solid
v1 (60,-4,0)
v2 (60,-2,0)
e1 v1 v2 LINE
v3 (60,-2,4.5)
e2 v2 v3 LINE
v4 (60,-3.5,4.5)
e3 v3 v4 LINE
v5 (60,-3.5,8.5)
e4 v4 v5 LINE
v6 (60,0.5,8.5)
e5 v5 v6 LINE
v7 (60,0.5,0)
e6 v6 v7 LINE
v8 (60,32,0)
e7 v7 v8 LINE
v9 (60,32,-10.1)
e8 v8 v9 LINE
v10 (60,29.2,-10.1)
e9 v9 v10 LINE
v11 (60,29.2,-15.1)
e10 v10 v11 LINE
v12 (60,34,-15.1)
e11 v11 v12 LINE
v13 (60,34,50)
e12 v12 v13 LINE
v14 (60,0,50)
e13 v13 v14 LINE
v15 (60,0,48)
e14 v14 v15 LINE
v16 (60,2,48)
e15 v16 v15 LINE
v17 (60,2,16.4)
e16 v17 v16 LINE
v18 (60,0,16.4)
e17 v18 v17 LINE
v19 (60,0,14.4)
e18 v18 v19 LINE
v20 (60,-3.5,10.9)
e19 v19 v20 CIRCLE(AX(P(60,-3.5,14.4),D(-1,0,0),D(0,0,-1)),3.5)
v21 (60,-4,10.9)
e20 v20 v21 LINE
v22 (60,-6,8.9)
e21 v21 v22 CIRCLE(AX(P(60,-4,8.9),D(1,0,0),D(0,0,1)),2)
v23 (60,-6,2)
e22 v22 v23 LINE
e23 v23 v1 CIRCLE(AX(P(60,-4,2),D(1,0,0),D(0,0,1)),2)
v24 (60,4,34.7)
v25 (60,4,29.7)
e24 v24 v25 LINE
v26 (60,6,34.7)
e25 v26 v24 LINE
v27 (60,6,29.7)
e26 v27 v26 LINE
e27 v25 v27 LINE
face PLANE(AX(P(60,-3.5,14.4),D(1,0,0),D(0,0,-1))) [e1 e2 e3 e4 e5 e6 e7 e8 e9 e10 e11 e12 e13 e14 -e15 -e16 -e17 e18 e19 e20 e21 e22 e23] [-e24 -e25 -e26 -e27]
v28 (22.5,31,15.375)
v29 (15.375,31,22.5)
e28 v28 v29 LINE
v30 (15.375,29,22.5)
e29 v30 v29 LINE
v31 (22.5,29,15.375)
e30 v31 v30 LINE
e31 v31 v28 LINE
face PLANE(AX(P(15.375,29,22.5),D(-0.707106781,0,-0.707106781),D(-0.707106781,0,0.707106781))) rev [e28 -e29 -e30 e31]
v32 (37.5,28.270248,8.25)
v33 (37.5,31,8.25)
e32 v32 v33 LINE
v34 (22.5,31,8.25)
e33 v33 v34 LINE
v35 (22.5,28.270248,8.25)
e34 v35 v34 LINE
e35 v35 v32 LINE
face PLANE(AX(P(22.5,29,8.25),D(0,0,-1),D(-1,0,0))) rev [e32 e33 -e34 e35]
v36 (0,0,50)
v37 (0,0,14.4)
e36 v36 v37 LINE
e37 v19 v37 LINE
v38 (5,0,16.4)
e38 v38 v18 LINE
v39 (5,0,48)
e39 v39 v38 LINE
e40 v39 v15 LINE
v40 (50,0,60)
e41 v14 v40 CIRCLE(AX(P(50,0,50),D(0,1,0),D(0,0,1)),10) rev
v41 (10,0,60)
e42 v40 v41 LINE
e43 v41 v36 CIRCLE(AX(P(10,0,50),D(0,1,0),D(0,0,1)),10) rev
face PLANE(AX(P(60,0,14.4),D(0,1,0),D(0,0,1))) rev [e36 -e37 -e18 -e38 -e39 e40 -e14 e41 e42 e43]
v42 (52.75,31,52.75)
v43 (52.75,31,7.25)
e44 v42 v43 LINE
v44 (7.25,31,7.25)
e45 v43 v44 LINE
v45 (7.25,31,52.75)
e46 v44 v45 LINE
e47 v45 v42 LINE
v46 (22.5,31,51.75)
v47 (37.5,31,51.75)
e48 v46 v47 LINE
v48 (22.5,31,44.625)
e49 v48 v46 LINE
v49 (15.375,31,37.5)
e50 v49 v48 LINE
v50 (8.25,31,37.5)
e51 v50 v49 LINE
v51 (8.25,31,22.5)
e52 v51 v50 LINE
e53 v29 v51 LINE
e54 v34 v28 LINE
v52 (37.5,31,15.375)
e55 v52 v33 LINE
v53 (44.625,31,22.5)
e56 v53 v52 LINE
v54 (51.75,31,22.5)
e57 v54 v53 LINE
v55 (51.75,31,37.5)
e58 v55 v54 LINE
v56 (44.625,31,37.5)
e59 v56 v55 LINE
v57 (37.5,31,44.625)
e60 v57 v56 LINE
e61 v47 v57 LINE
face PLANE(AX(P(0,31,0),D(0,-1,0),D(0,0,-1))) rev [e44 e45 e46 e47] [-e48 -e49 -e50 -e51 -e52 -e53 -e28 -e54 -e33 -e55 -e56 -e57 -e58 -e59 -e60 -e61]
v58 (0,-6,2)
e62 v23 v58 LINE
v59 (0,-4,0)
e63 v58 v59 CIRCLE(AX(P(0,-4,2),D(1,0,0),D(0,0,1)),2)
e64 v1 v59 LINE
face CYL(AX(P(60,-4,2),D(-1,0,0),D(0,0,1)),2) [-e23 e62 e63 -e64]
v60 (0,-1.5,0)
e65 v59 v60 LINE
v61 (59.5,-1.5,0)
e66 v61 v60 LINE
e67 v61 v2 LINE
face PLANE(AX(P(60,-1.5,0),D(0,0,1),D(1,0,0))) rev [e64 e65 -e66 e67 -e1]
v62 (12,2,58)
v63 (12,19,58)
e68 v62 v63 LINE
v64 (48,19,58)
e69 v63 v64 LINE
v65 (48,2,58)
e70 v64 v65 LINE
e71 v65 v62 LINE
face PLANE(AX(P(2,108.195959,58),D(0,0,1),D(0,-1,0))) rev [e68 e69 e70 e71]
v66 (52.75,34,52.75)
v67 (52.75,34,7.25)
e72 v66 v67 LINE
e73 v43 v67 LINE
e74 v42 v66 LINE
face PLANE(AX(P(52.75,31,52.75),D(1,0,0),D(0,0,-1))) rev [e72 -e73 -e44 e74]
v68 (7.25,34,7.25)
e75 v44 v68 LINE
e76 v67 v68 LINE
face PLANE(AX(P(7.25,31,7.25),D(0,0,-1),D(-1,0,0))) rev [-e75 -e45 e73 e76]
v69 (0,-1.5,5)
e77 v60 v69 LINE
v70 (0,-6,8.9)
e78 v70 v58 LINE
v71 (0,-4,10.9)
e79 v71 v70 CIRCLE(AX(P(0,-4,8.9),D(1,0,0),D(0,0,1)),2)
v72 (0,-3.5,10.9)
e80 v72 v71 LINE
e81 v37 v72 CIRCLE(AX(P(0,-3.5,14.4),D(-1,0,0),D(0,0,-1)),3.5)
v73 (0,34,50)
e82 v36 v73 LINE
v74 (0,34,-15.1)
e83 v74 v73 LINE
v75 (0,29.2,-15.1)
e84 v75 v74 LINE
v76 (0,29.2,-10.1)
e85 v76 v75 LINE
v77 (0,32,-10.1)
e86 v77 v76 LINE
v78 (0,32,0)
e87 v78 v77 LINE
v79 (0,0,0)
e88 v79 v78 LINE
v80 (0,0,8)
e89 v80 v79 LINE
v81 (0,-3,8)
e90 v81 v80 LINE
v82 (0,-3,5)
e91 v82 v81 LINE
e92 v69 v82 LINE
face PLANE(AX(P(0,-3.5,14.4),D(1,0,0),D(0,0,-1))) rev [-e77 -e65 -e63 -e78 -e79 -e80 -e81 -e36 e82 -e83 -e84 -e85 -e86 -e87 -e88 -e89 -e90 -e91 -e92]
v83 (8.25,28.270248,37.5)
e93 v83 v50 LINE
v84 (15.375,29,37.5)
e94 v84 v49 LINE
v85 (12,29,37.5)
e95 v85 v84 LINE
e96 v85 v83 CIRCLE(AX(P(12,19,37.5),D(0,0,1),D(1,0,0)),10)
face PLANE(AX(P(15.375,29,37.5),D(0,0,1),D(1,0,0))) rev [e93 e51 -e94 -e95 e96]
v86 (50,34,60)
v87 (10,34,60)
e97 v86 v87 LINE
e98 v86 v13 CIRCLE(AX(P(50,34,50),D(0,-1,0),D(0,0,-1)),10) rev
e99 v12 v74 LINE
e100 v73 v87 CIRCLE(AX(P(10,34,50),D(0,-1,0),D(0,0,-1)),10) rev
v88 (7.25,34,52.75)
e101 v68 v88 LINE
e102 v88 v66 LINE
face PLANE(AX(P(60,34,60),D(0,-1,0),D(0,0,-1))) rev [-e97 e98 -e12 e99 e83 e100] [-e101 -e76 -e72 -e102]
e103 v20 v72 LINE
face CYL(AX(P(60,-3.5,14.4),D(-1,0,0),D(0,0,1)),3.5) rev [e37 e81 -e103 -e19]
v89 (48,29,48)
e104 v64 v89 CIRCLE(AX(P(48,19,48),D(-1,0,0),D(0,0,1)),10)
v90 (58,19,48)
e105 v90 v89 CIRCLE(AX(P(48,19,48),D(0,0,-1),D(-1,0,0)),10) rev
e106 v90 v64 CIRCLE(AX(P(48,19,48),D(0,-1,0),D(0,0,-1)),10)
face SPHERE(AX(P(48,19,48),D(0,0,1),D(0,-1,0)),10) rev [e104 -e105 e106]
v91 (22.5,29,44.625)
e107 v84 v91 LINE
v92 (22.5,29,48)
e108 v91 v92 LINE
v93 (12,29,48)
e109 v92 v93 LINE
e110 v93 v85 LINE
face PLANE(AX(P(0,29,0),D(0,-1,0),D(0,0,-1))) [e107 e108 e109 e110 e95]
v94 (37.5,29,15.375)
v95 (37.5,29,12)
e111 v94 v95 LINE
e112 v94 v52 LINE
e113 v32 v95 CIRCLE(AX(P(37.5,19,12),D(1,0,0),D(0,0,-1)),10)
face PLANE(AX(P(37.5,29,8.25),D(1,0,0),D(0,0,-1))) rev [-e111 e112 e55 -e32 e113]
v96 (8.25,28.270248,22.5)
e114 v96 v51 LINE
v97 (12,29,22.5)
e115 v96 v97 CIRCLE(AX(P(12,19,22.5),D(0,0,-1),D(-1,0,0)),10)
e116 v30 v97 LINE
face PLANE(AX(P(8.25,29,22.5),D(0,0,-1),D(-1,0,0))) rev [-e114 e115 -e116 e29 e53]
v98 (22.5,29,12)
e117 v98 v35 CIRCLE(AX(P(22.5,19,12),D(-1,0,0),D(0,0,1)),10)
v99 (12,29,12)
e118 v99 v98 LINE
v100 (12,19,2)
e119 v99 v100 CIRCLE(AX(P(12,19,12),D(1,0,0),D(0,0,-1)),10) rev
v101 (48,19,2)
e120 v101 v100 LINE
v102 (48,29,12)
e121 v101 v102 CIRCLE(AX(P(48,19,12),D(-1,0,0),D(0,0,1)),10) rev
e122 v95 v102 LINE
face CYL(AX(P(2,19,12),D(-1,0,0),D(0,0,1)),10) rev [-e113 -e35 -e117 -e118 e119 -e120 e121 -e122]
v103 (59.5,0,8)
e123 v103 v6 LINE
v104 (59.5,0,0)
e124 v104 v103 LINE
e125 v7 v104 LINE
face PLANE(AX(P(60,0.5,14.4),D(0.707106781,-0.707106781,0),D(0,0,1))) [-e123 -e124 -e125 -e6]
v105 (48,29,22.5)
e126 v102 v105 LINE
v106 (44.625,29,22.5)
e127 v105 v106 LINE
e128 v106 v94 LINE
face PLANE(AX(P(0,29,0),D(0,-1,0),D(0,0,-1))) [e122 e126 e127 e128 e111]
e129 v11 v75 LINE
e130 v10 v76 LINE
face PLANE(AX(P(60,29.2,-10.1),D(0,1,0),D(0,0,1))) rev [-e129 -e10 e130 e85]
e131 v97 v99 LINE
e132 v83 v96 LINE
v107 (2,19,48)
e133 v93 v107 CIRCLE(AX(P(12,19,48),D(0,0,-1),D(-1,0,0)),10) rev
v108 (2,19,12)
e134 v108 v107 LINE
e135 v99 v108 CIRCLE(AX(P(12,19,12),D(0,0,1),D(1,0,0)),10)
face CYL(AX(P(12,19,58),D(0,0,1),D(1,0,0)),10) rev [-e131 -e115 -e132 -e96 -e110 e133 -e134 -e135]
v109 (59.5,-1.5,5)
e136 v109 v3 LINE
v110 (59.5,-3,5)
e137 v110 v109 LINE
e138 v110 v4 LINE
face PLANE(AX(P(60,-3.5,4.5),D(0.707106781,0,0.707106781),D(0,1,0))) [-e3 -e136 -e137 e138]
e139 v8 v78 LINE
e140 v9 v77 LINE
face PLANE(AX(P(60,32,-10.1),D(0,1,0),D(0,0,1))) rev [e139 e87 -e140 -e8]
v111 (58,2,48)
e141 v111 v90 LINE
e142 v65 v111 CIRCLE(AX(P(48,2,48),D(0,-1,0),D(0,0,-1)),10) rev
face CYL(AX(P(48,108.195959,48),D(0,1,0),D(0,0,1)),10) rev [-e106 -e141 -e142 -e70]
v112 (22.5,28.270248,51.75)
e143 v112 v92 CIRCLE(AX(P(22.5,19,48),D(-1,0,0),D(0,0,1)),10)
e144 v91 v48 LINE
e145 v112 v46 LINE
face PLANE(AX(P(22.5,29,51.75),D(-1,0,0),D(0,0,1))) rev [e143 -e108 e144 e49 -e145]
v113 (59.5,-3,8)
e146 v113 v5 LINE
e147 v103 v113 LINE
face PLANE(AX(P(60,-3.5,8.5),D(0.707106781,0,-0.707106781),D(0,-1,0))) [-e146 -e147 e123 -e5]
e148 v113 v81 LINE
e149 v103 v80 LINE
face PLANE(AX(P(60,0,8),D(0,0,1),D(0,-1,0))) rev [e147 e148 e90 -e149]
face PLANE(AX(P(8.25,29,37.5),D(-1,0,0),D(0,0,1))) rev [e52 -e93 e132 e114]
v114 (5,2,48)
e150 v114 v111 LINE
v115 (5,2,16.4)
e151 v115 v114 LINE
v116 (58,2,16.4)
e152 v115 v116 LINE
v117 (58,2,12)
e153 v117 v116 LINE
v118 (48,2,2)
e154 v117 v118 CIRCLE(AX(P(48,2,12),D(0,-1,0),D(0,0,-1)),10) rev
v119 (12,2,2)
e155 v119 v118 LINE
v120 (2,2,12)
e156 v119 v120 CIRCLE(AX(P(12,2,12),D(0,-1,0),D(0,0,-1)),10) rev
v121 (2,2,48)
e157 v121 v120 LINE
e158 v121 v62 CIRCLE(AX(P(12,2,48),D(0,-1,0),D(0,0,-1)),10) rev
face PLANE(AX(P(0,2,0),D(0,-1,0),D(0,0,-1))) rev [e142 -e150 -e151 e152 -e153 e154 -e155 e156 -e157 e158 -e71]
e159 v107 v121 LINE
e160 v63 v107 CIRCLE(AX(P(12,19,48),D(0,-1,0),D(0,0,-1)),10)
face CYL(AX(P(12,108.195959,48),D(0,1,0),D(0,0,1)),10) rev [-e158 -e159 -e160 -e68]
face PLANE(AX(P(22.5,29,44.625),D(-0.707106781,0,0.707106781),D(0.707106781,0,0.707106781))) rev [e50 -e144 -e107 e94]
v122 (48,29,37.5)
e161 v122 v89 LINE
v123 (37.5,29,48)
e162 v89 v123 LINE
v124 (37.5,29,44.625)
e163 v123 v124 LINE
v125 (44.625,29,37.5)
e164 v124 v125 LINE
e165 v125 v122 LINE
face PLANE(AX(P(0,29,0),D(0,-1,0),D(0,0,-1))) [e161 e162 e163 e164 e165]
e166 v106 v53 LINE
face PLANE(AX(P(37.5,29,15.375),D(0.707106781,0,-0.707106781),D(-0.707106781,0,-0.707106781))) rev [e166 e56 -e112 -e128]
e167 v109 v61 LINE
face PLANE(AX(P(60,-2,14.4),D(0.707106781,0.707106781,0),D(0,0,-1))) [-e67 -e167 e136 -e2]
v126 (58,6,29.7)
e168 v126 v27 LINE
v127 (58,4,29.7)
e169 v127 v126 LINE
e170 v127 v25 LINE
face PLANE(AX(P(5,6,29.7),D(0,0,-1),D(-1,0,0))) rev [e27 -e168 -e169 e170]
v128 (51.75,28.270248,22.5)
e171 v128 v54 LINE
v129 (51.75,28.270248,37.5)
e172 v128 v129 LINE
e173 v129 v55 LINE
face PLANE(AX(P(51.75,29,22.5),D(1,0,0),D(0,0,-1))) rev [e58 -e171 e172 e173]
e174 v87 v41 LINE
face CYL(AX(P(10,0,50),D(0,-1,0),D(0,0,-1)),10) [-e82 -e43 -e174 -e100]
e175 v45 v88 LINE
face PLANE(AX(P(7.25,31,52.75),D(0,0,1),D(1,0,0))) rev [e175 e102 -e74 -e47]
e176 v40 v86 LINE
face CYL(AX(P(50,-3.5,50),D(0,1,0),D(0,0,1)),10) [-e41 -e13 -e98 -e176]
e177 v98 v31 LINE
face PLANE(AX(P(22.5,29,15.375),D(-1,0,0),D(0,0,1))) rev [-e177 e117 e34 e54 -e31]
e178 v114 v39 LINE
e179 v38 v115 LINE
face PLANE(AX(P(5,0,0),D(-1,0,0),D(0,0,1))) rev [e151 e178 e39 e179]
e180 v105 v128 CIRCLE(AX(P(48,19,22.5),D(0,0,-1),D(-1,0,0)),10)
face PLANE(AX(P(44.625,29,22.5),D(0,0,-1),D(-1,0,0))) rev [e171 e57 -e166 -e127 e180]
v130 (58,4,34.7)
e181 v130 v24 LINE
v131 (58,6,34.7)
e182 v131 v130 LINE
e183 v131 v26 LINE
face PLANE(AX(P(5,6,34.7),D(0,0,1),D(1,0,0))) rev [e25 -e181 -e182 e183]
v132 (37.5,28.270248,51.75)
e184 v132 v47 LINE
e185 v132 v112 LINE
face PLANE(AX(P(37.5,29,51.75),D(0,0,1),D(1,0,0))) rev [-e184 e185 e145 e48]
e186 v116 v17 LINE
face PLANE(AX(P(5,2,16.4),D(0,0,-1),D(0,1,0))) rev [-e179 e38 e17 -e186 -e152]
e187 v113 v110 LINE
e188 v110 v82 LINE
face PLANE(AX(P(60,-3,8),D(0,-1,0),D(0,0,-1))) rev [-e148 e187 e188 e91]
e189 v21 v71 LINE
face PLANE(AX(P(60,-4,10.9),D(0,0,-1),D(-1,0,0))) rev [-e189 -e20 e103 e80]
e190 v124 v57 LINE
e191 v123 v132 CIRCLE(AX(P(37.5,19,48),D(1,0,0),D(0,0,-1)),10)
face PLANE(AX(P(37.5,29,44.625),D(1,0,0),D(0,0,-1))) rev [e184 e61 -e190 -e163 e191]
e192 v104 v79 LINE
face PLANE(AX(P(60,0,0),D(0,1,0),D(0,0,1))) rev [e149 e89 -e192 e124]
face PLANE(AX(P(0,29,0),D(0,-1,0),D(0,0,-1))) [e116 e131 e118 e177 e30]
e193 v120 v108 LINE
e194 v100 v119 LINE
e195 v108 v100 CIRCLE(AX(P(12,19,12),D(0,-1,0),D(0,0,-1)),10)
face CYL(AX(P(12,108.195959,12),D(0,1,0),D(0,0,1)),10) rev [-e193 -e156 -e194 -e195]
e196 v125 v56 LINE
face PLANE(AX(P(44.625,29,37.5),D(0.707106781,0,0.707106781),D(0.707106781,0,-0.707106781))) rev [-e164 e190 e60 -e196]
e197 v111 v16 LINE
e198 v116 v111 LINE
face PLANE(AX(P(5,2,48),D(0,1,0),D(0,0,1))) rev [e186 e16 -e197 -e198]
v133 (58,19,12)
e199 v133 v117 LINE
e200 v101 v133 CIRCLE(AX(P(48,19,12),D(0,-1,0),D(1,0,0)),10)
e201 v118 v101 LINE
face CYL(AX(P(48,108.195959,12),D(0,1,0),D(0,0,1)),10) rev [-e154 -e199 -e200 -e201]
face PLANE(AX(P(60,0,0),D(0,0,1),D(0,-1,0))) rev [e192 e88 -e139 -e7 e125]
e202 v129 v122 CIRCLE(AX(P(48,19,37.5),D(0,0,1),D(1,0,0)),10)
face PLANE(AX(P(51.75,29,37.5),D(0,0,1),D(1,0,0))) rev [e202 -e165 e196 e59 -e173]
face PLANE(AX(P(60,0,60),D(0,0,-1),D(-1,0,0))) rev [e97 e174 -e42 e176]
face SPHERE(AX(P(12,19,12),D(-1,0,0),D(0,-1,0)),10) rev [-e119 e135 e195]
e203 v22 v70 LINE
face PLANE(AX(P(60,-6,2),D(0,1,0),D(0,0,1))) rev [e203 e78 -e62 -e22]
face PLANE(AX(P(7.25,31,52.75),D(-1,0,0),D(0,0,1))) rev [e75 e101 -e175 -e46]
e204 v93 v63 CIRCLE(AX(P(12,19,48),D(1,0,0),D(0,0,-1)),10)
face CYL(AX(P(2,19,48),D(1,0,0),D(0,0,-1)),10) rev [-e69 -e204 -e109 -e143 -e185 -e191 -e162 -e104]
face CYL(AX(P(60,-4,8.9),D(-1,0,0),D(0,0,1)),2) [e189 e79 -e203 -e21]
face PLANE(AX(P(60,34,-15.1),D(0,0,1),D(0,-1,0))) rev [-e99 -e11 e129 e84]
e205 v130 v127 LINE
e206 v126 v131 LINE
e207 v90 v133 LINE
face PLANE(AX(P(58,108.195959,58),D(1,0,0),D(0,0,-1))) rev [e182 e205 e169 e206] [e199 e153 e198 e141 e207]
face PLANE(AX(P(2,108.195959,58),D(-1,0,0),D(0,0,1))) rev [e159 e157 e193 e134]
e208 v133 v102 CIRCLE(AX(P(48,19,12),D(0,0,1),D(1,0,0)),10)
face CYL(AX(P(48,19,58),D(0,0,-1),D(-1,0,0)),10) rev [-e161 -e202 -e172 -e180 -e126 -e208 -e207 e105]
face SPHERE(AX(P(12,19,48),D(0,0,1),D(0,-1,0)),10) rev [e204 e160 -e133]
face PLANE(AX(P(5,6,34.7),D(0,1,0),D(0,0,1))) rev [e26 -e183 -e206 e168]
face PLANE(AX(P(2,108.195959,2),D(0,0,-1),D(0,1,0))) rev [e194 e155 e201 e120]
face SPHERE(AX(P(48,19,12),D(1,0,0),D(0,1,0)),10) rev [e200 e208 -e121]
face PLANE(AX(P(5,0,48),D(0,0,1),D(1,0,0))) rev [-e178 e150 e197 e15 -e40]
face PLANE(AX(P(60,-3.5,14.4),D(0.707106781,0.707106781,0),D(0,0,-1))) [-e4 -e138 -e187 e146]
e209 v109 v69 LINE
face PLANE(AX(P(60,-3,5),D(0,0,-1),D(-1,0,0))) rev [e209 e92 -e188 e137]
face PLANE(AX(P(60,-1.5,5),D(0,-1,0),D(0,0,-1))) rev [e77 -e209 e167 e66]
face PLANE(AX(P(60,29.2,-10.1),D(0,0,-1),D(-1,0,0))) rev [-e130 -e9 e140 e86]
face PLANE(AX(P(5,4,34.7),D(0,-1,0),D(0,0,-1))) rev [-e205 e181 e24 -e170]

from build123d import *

# Parameters (mm, degrees)
BOSS_EXTRU_1_DEPTH       = 60
ESQUISSE4_W              = 45.5
ESQUISSE4_H              = 45.5
ENL_V_MAT_EXTRU_2_DEPTH  = 3
ENL_V_MAT_EXTRU_4_DEPTH  = 2
ENL_V_START              = -2
ESQUISSE5_W              = 56
ESQUISSE5_H              = 56
ENL_V_MAT_EXTRU_3_DEPTH  = 27
CONG_1_R                 = 10
CHANFREIN1_SIZE          = 0.5
ESQUISSE15_W             = 31.6
ESQUISSE15_H             = 2
ESQUISSE15_W_2           = 5
ENL_V_MAT_EXTRU_11_DEPTH = 55


with BuildPart() as part:
    # Esquisse1 → Boss.-Extru.1 (new body)
    with BuildSketch(Plane(origin=(0, 0, 0), x_dir=(0, 0, -1), z_dir=(1, 0, 0))):
        with BuildLine():
            Line((0, 0), (-8, 0))
            Line((-8, 0), (-8, -3))
            Line((-8, -3), (-5, -3))
            Line((-5, -3), (-5, -1.5))
            Line((-5, -1.5), (0, -1.5))
            Line((0, -1.5), (0, -4))
            ThreePointArc((0, -4), (-0.585786438, -5.414213562), (-2, -6))
            Line((-2, -6), (-8.9, -6))
            ThreePointArc((-8.9, -6), (-10.314213562, -5.414213562), (-10.9, -4))
            Line((-10.9, -4), (-10.9, -3.5))
            ThreePointArc((-10.9, -3.5), (-11.925126266, -1.025126266), (-14.4, 0))
            Line((-14.4, 0), (-60, 0))
            Line((-60, 0), (-60, 34))
            Line((-60, 34), (15.1, 34))
            Line((15.1, 34), (15.1, 29.2))
            Line((15.1, 29.2), (10.1, 29.2))
            Line((10.1, 29.2), (10.1, 32))
            Line((10.1, 32), (0, 32))
            Line((0, 32), (0, 0))
        make_face()
    extrude(amount=BOSS_EXTRU_1_DEPTH)

    # Esquisse4 → Enlèv. mat.-Extru.2 (cut)
    with BuildSketch(Plane(origin=(0, 34, 0), x_dir=(1, 0, 0), z_dir=(0, 1, 0))):
        with Locations((30, -30)):
            Rectangle(ESQUISSE4_W, ESQUISSE4_H)
    extrude(amount=-ENL_V_MAT_EXTRU_2_DEPTH, mode=Mode.SUBTRACT)

    # Esquisse6 → Enlèv. mat.-Extru.4 (cut)
    with BuildSketch(Plane(origin=(0, 31, 0), x_dir=(1, 0, 0), z_dir=(0, 1, 0))):
        Polygon((8.25, -22.5), (15.375, -22.5), (22.5, -15.375), (22.5, -8.25), (37.5, -8.25), (37.5, -15.375), (44.625, -22.5), (51.75, -22.5), (51.75, -37.5), (44.625, -37.5), (37.5, -44.625), (37.5, -51.75), (22.5, -51.75), (22.5, -44.625), (15.375, -37.5), (8.25, -37.5), align=None)
    extrude(amount=-ENL_V_MAT_EXTRU_4_DEPTH, mode=Mode.SUBTRACT)

    # Esquisse5 → Enlèv. mat.-Extru.3 (cut)
    with BuildSketch(Plane.XZ.offset(ENL_V_START)):
        with Locations((30, 30)):
            Rectangle(ESQUISSE5_W, ESQUISSE5_H)
    extrude(amount=-ENL_V_MAT_EXTRU_3_DEPTH, mode=Mode.SUBTRACT)

    # Congé1
    # the kernel refuses this fillet: 10 mm, written as the material it adds along each edge
    with BuildSketch(Plane(origin=(48, 19, 12), x_dir=(1, 0, 0), z_dir=(0, 1, 0))) as cong_1_piece_1_section:
        Polygon((0, 0), (CONG_1_R, 0), (CONG_1_R, CONG_1_R), (0, CONG_1_R), align=None)
    cong_1_piece_1 = extrude(amount=CONG_1_R, mode=Mode.PRIVATE)
    cong_1_piece_1 = cong_1_piece_1 - Plane(origin=(48, 19, 12), x_dir=(-0.7071067811865476, 0, 0.7071067811865475), z_dir=(0, 1, 0)) * Sphere(CONG_1_R, mode=Mode.PRIVATE)
    add(cong_1_piece_1)
    with BuildSketch(Plane(origin=(12, 19, 12), x_dir=(-1, 0, 0), z_dir=(0, 1, 0))) as cong_1_piece_2_section:
        Polygon((0, 0), (CONG_1_R, 0), (CONG_1_R, -CONG_1_R), (0, -CONG_1_R), align=None)
    cong_1_piece_2 = extrude(amount=CONG_1_R, mode=Mode.PRIVATE)
    cong_1_piece_2 = cong_1_piece_2 - Plane(origin=(12, 19, 12), x_dir=(0.7071067811865475, 0, 0.7071067811865477), z_dir=(0, 1, 0)) * Sphere(CONG_1_R, mode=Mode.PRIVATE)
    add(cong_1_piece_2)
    with BuildSketch(Plane(origin=(48, 19, 48), x_dir=(0, 0, 1), z_dir=(0, 1, 0))) as cong_1_piece_3_section:
        Polygon((0, 0), (CONG_1_R, 0), (CONG_1_R, CONG_1_R), (0, CONG_1_R), align=None)
    cong_1_piece_3 = extrude(amount=CONG_1_R, mode=Mode.PRIVATE)
    cong_1_piece_3 = cong_1_piece_3 - Plane(origin=(48, 19, 48), x_dir=(-0.7071067811865475, 0, -0.7071067811865477), z_dir=(0, 1, 0)) * Sphere(CONG_1_R, mode=Mode.PRIVATE)
    add(cong_1_piece_3)
    with BuildSketch(Plane(origin=(12, 19, 48), x_dir=(0, 0, 1), z_dir=(0, 1, 0))) as cong_1_piece_4_section:
        Polygon((0, 0), (CONG_1_R, 0), (CONG_1_R, -CONG_1_R), (0, -CONG_1_R), align=None)
    cong_1_piece_4 = extrude(amount=CONG_1_R, mode=Mode.PRIVATE)
    cong_1_piece_4 = cong_1_piece_4 - Plane(origin=(12, 19, 48), x_dir=(0.7071067811865476, 0, -0.7071067811865475), z_dir=(0, 1, 0)) * Sphere(CONG_1_R, mode=Mode.PRIVATE)
    add(cong_1_piece_4)
    with BuildSketch(Plane(origin=(48, 29, 2), x_dir=(0, 0, 1), z_dir=(-1, 0, 0))) as cong_1_piece_5_section:
        with BuildLine():
            CenterArc((CONG_1_R, -CONG_1_R), CONG_1_R, 90, 90)
            Line((0, -CONG_1_R), (0, 0))
            Line((0, 0), (CONG_1_R, 0))
        make_face()
    cong_1_piece_5 = extrude(amount=36, mode=Mode.PRIVATE)
    cong_1_piece_5 = split(cong_1_piece_5, bisect_by=Plane(origin=(37.5, 28.926962603, 9.610234862), z_dir=(1, 0, 0)), keep=Keep.TOP, mode=Mode.PRIVATE)
    cong_1_piece_5 = split(cong_1_piece_5, bisect_by=Plane(origin=(42.75, 28.926962603, 8.25), z_dir=(0, 0, 1)), keep=Keep.TOP, mode=Mode.PRIVATE)
    add(cong_1_piece_5)
    with BuildSketch(Plane(origin=(48, 29, 2), x_dir=(0, 0, 1), z_dir=(-1, 0, 0))) as cong_1_piece_6_section:
        with BuildLine():
            CenterArc((CONG_1_R, -CONG_1_R), CONG_1_R, 90, 90)
            Line((0, -CONG_1_R), (0, 0))
            Line((0, 0), (CONG_1_R, 0))
        make_face()
    cong_1_piece_6 = extrude(amount=36, mode=Mode.PRIVATE)
    cong_1_piece_6 = split(cong_1_piece_6, bisect_by=Plane(origin=(37.5, 26.584629987, 3.89445771), z_dir=(1, 0, 0)), keep=Keep.TOP, mode=Mode.PRIVATE)
    cong_1_piece_6 = split(cong_1_piece_6, bisect_by=Plane(origin=(42.75, 26.584629987, 8.25), z_dir=(0, 0, -1)), keep=Keep.TOP, mode=Mode.PRIVATE)
    add(cong_1_piece_6)
    with BuildSketch(Plane(origin=(48, 29, 2), x_dir=(0, 0, 1), z_dir=(-1, 0, 0))) as cong_1_piece_7_section:
        with BuildLine():
            CenterArc((CONG_1_R, -CONG_1_R), CONG_1_R, 90, 90)
            Line((0, -CONG_1_R), (0, 0))
            Line((0, 0), (CONG_1_R, 0))
        make_face()
    cong_1_piece_7 = extrude(amount=36, mode=Mode.PRIVATE)
    cong_1_piece_7 = split(cong_1_piece_7, bisect_by=Plane(origin=(37.5, 26.584629987, 3.89445771), z_dir=(-1, 0, 0)), keep=Keep.TOP, mode=Mode.PRIVATE)
    cong_1_piece_7 = split(cong_1_piece_7, bisect_by=Plane(origin=(30, 26.584629987, 8.25), z_dir=(0, 0, -1)), keep=Keep.TOP, mode=Mode.PRIVATE)
    cong_1_piece_7 = split(cong_1_piece_7, bisect_by=Plane(origin=(22.5, 26.584629987, 3.89445771), z_dir=(1, 0, 0)), keep=Keep.TOP, mode=Mode.PRIVATE)
    add(cong_1_piece_7)
    with BuildSketch(Plane(origin=(48, 29, 2), x_dir=(0, 0, 1), z_dir=(-1, 0, 0))) as cong_1_piece_8_section:
        with BuildLine():
            CenterArc((CONG_1_R, -CONG_1_R), CONG_1_R, 90, 90)
            Line((0, -CONG_1_R), (0, 0))
            Line((0, 0), (CONG_1_R, 0))
        make_face()
    cong_1_piece_8 = extrude(amount=36, mode=Mode.PRIVATE)
    cong_1_piece_8 = split(cong_1_piece_8, bisect_by=Plane(origin=(17.25, 28.926962603, 8.25), z_dir=(0, 0, 1)), keep=Keep.TOP, mode=Mode.PRIVATE)
    cong_1_piece_8 = split(cong_1_piece_8, bisect_by=Plane(origin=(22.5, 28.926962603, 9.610234862), z_dir=(-1, 0, 0)), keep=Keep.TOP, mode=Mode.PRIVATE)
    add(cong_1_piece_8)
    with BuildSketch(Plane(origin=(48, 29, 2), x_dir=(0, 0, 1), z_dir=(-1, 0, 0))) as cong_1_piece_9_section:
        with BuildLine():
            CenterArc((CONG_1_R, -CONG_1_R), CONG_1_R, 90, 90)
            Line((0, -CONG_1_R), (0, 0))
            Line((0, 0), (CONG_1_R, 0))
        make_face()
    cong_1_piece_9 = extrude(amount=36, mode=Mode.PRIVATE)
    cong_1_piece_9 = split(cong_1_piece_9, bisect_by=Plane(origin=(17.25, 26.584629987, 8.25), z_dir=(0, 0, -1)), keep=Keep.TOP, mode=Mode.PRIVATE)
    cong_1_piece_9 = split(cong_1_piece_9, bisect_by=Plane(origin=(22.5, 26.584629987, 3.89445771), z_dir=(-1, 0, 0)), keep=Keep.TOP, mode=Mode.PRIVATE)
    add(cong_1_piece_9)
    with BuildSketch(Plane(origin=(58, 29, 48), x_dir=(-1, 0, 0), z_dir=(0, 0, -1))) as cong_1_piece_10_section:
        with BuildLine():
            CenterArc((CONG_1_R, -CONG_1_R), CONG_1_R, 90, 90)
            Line((0, -CONG_1_R), (0, 0))
            Line((0, 0), (CONG_1_R, 0))
        make_face()
    cong_1_piece_10 = extrude(amount=36, mode=Mode.PRIVATE)
    cong_1_piece_10 = split(cong_1_piece_10, bisect_by=Plane(origin=(50.389765138, 28.926962603, 37.5), z_dir=(0, 0, 1)), keep=Keep.TOP, mode=Mode.PRIVATE)
    cong_1_piece_10 = split(cong_1_piece_10, bisect_by=Plane(origin=(51.75, 28.926962603, 42.75), z_dir=(-1, 0, 0)), keep=Keep.TOP, mode=Mode.PRIVATE)
    add(cong_1_piece_10)
    with BuildSketch(Plane(origin=(58, 29, 48), x_dir=(-1, 0, 0), z_dir=(0, 0, -1))) as cong_1_piece_11_section:
        with BuildLine():
            CenterArc((CONG_1_R, -CONG_1_R), CONG_1_R, 90, 90)
            Line((0, -CONG_1_R), (0, 0))
            Line((0, 0), (CONG_1_R, 0))
        make_face()
    cong_1_piece_11 = extrude(amount=36, mode=Mode.PRIVATE)
    cong_1_piece_11 = split(cong_1_piece_11, bisect_by=Plane(origin=(56.10554229, 26.584629987, 37.5), z_dir=(0, 0, 1)), keep=Keep.TOP, mode=Mode.PRIVATE)
    cong_1_piece_11 = split(cong_1_piece_11, bisect_by=Plane(origin=(51.75, 26.584629987, 42.75), z_dir=(1, 0, 0)), keep=Keep.TOP, mode=Mode.PRIVATE)
    add(cong_1_piece_11)
    with BuildSketch(Plane(origin=(58, 29, 48), x_dir=(-1, 0, 0), z_dir=(0, 0, -1))) as cong_1_piece_12_section:
        with BuildLine():
            CenterArc((CONG_1_R, -CONG_1_R), CONG_1_R, 90, 90)
            Line((0, -CONG_1_R), (0, 0))
            Line((0, 0), (CONG_1_R, 0))
        make_face()
    cong_1_piece_12 = extrude(amount=36, mode=Mode.PRIVATE)
    cong_1_piece_12 = split(cong_1_piece_12, bisect_by=Plane(origin=(56.10554229, 26.584629987, 37.5), z_dir=(0, 0, -1)), keep=Keep.TOP, mode=Mode.PRIVATE)
    cong_1_piece_12 = split(cong_1_piece_12, bisect_by=Plane(origin=(51.75, 26.584629987, 30), z_dir=(1, 0, 0)), keep=Keep.TOP, mode=Mode.PRIVATE)
    cong_1_piece_12 = split(cong_1_piece_12, bisect_by=Plane(origin=(56.10554229, 26.584629987, 22.5), z_dir=(0, 0, 1)), keep=Keep.TOP, mode=Mode.PRIVATE)
    add(cong_1_piece_12)
    with BuildSketch(Plane(origin=(58, 29, 48), x_dir=(-1, 0, 0), z_dir=(0, 0, -1))) as cong_1_piece_13_section:
        with BuildLine():
            CenterArc((CONG_1_R, -CONG_1_R), CONG_1_R, 90, 90)
            Line((0, -CONG_1_R), (0, 0))
            Line((0, 0), (CONG_1_R, 0))
        make_face()
    cong_1_piece_13 = extrude(amount=36, mode=Mode.PRIVATE)
    cong_1_piece_13 = split(cong_1_piece_13, bisect_by=Plane(origin=(51.75, 28.926962603, 17.25), z_dir=(-1, 0, 0)), keep=Keep.TOP, mode=Mode.PRIVATE)
    cong_1_piece_13 = split(cong_1_piece_13, bisect_by=Plane(origin=(50.389765138, 28.926962603, 22.5), z_dir=(0, 0, -1)), keep=Keep.TOP, mode=Mode.PRIVATE)
    add(cong_1_piece_13)
    with BuildSketch(Plane(origin=(58, 29, 48), x_dir=(-1, 0, 0), z_dir=(0, 0, -1))) as cong_1_piece_14_section:
        with BuildLine():
            CenterArc((CONG_1_R, -CONG_1_R), CONG_1_R, 90, 90)
            Line((0, -CONG_1_R), (0, 0))
            Line((0, 0), (CONG_1_R, 0))
        make_face()
    cong_1_piece_14 = extrude(amount=36, mode=Mode.PRIVATE)
    cong_1_piece_14 = split(cong_1_piece_14, bisect_by=Plane(origin=(51.75, 26.584629987, 17.25), z_dir=(1, 0, 0)), keep=Keep.TOP, mode=Mode.PRIVATE)
    cong_1_piece_14 = split(cong_1_piece_14, bisect_by=Plane(origin=(56.10554229, 26.584629987, 22.5), z_dir=(0, 0, -1)), keep=Keep.TOP, mode=Mode.PRIVATE)
    add(cong_1_piece_14)
    with BuildSketch(Plane(origin=(12, 29, 58), x_dir=(0, 0, -1), z_dir=(1, 0, 0))) as cong_1_piece_15_section:
        with BuildLine():
            CenterArc((CONG_1_R, -CONG_1_R), CONG_1_R, 90, 90)
            Line((0, -CONG_1_R), (0, 0))
            Line((0, 0), (CONG_1_R, 0))
        make_face()
    cong_1_piece_15 = extrude(amount=36, mode=Mode.PRIVATE)
    cong_1_piece_15 = split(cong_1_piece_15, bisect_by=Plane(origin=(22.5, 28.926962603, 50.389765138), z_dir=(-1, 0, 0)), keep=Keep.TOP, mode=Mode.PRIVATE)
    cong_1_piece_15 = split(cong_1_piece_15, bisect_by=Plane(origin=(17.25, 28.926962603, 51.75), z_dir=(0, 0, -1)), keep=Keep.TOP, mode=Mode.PRIVATE)
    add(cong_1_piece_15)
    with BuildSketch(Plane(origin=(12, 29, 58), x_dir=(0, 0, -1), z_dir=(1, 0, 0))) as cong_1_piece_16_section:
        with BuildLine():
            CenterArc((CONG_1_R, -CONG_1_R), CONG_1_R, 90, 90)
            Line((0, -CONG_1_R), (0, 0))
            Line((0, 0), (CONG_1_R, 0))
        make_face()
    cong_1_piece_16 = extrude(amount=36, mode=Mode.PRIVATE)
    cong_1_piece_16 = split(cong_1_piece_16, bisect_by=Plane(origin=(22.5, 26.584629987, 56.10554229), z_dir=(-1, 0, 0)), keep=Keep.TOP, mode=Mode.PRIVATE)
    cong_1_piece_16 = split(cong_1_piece_16, bisect_by=Plane(origin=(17.25, 26.584629987, 51.75), z_dir=(0, 0, 1)), keep=Keep.TOP, mode=Mode.PRIVATE)
    add(cong_1_piece_16)
    with BuildSketch(Plane(origin=(12, 29, 58), x_dir=(0, 0, -1), z_dir=(1, 0, 0))) as cong_1_piece_17_section:
        with BuildLine():
            CenterArc((CONG_1_R, -CONG_1_R), CONG_1_R, 90, 90)
            Line((0, -CONG_1_R), (0, 0))
            Line((0, 0), (CONG_1_R, 0))
        make_face()
    cong_1_piece_17 = extrude(amount=36, mode=Mode.PRIVATE)
    cong_1_piece_17 = split(cong_1_piece_17, bisect_by=Plane(origin=(22.5, 26.584629987, 56.10554229), z_dir=(1, 0, 0)), keep=Keep.TOP, mode=Mode.PRIVATE)
    cong_1_piece_17 = split(cong_1_piece_17, bisect_by=Plane(origin=(30, 26.584629987, 51.75), z_dir=(0, 0, 1)), keep=Keep.TOP, mode=Mode.PRIVATE)
    cong_1_piece_17 = split(cong_1_piece_17, bisect_by=Plane(origin=(37.5, 26.584629987, 56.10554229), z_dir=(-1, 0, 0)), keep=Keep.TOP, mode=Mode.PRIVATE)
    add(cong_1_piece_17)
    with BuildSketch(Plane(origin=(12, 29, 58), x_dir=(0, 0, -1), z_dir=(1, 0, 0))) as cong_1_piece_18_section:
        with BuildLine():
            CenterArc((CONG_1_R, -CONG_1_R), CONG_1_R, 90, 90)
            Line((0, -CONG_1_R), (0, 0))
            Line((0, 0), (CONG_1_R, 0))
        make_face()
    cong_1_piece_18 = extrude(amount=36, mode=Mode.PRIVATE)
    cong_1_piece_18 = split(cong_1_piece_18, bisect_by=Plane(origin=(42.75, 28.926962603, 51.75), z_dir=(0, 0, -1)), keep=Keep.TOP, mode=Mode.PRIVATE)
    cong_1_piece_18 = split(cong_1_piece_18, bisect_by=Plane(origin=(37.5, 28.926962603, 50.389765138), z_dir=(1, 0, 0)), keep=Keep.TOP, mode=Mode.PRIVATE)
    add(cong_1_piece_18)
    with BuildSketch(Plane(origin=(12, 29, 58), x_dir=(0, 0, -1), z_dir=(1, 0, 0))) as cong_1_piece_19_section:
        with BuildLine():
            CenterArc((CONG_1_R, -CONG_1_R), CONG_1_R, 90, 90)
            Line((0, -CONG_1_R), (0, 0))
            Line((0, 0), (CONG_1_R, 0))
        make_face()
    cong_1_piece_19 = extrude(amount=36, mode=Mode.PRIVATE)
    cong_1_piece_19 = split(cong_1_piece_19, bisect_by=Plane(origin=(42.75, 26.584629987, 51.75), z_dir=(0, 0, 1)), keep=Keep.TOP, mode=Mode.PRIVATE)
    cong_1_piece_19 = split(cong_1_piece_19, bisect_by=Plane(origin=(37.5, 26.584629987, 56.10554229), z_dir=(1, 0, 0)), keep=Keep.TOP, mode=Mode.PRIVATE)
    add(cong_1_piece_19)
    with BuildSketch(Plane(origin=(2, 29, 12), x_dir=(1, 0, 0), z_dir=(0, 0, 1))) as cong_1_piece_20_section:
        with BuildLine():
            CenterArc((CONG_1_R, -CONG_1_R), CONG_1_R, 90, 90)
            Line((0, -CONG_1_R), (0, 0))
            Line((0, 0), (CONG_1_R, 0))
        make_face()
    cong_1_piece_20 = extrude(amount=36, mode=Mode.PRIVATE)
    cong_1_piece_20 = split(cong_1_piece_20, bisect_by=Plane(origin=(8.25, 28.926962603, 17.25), z_dir=(1, 0, 0)), keep=Keep.TOP, mode=Mode.PRIVATE)
    cong_1_piece_20 = split(cong_1_piece_20, bisect_by=Plane(origin=(9.610234862, 28.926962603, 22.5), z_dir=(0, 0, -1)), keep=Keep.TOP, mode=Mode.PRIVATE)
    add(cong_1_piece_20)
    with BuildSketch(Plane(origin=(2, 29, 12), x_dir=(1, 0, 0), z_dir=(0, 0, 1))) as cong_1_piece_21_section:
        with BuildLine():
            CenterArc((CONG_1_R, -CONG_1_R), CONG_1_R, 90, 90)
            Line((0, -CONG_1_R), (0, 0))
            Line((0, 0), (CONG_1_R, 0))
        make_face()
    cong_1_piece_21 = extrude(amount=36, mode=Mode.PRIVATE)
    cong_1_piece_21 = split(cong_1_piece_21, bisect_by=Plane(origin=(8.25, 26.584629987, 17.25), z_dir=(-1, 0, 0)), keep=Keep.TOP, mode=Mode.PRIVATE)
    cong_1_piece_21 = split(cong_1_piece_21, bisect_by=Plane(origin=(3.89445771, 26.584629987, 22.5), z_dir=(0, 0, -1)), keep=Keep.TOP, mode=Mode.PRIVATE)
    add(cong_1_piece_21)
    with BuildSketch(Plane(origin=(2, 29, 12), x_dir=(1, 0, 0), z_dir=(0, 0, 1))) as cong_1_piece_22_section:
        with BuildLine():
            CenterArc((CONG_1_R, -CONG_1_R), CONG_1_R, 90, 90)
            Line((0, -CONG_1_R), (0, 0))
            Line((0, 0), (CONG_1_R, 0))
        make_face()
    cong_1_piece_22 = extrude(amount=36, mode=Mode.PRIVATE)
    cong_1_piece_22 = split(cong_1_piece_22, bisect_by=Plane(origin=(8.25, 26.584629987, 30), z_dir=(-1, 0, 0)), keep=Keep.TOP, mode=Mode.PRIVATE)
    cong_1_piece_22 = split(cong_1_piece_22, bisect_by=Plane(origin=(3.89445771, 26.584629987, 37.5), z_dir=(0, 0, -1)), keep=Keep.TOP, mode=Mode.PRIVATE)
    cong_1_piece_22 = split(cong_1_piece_22, bisect_by=Plane(origin=(3.89445771, 26.584629987, 22.5), z_dir=(0, 0, 1)), keep=Keep.TOP, mode=Mode.PRIVATE)
    add(cong_1_piece_22)
    with BuildSketch(Plane(origin=(2, 29, 12), x_dir=(1, 0, 0), z_dir=(0, 0, 1))) as cong_1_piece_23_section:
        with BuildLine():
            CenterArc((CONG_1_R, -CONG_1_R), CONG_1_R, 90, 90)
            Line((0, -CONG_1_R), (0, 0))
            Line((0, 0), (CONG_1_R, 0))
        make_face()
    cong_1_piece_23 = extrude(amount=36, mode=Mode.PRIVATE)
    cong_1_piece_23 = split(cong_1_piece_23, bisect_by=Plane(origin=(8.25, 28.926962603, 42.75), z_dir=(1, 0, 0)), keep=Keep.TOP, mode=Mode.PRIVATE)
    cong_1_piece_23 = split(cong_1_piece_23, bisect_by=Plane(origin=(9.610234862, 28.926962603, 37.5), z_dir=(0, 0, 1)), keep=Keep.TOP, mode=Mode.PRIVATE)
    add(cong_1_piece_23)
    with BuildSketch(Plane(origin=(2, 29, 12), x_dir=(1, 0, 0), z_dir=(0, 0, 1))) as cong_1_piece_24_section:
        with BuildLine():
            CenterArc((CONG_1_R, -CONG_1_R), CONG_1_R, 90, 90)
            Line((0, -CONG_1_R), (0, 0))
            Line((0, 0), (CONG_1_R, 0))
        make_face()
    cong_1_piece_24 = extrude(amount=36, mode=Mode.PRIVATE)
    cong_1_piece_24 = split(cong_1_piece_24, bisect_by=Plane(origin=(8.25, 26.584629987, 42.75), z_dir=(-1, 0, 0)), keep=Keep.TOP, mode=Mode.PRIVATE)
    cong_1_piece_24 = split(cong_1_piece_24, bisect_by=Plane(origin=(3.89445771, 26.584629987, 37.5), z_dir=(0, 0, 1)), keep=Keep.TOP, mode=Mode.PRIVATE)
    add(cong_1_piece_24)
    with BuildSketch(Plane(origin=(58, 2, 58), x_dir=(-1, 0, 0), z_dir=(0, 1, 0)), Plane(origin=(58, 2, 2), x_dir=(0, 0, 1), z_dir=(0, 1, 0))) as cong_1_piece_25:
        with BuildLine():
            CenterArc((CONG_1_R, -CONG_1_R), CONG_1_R, 90, 90)
            Line((0, -CONG_1_R), (0, 0))
            Line((0, 0), (CONG_1_R, 0))
        make_face()
    extrude(amount=17)
    with BuildSketch(Plane(origin=(2, 2, 2), x_dir=(0, 0, 1), z_dir=(0, 1, 0)), Plane(origin=(2, 2, 58), x_dir=(1, 0, 0), z_dir=(0, 1, 0))) as cong_1_piece_26:
        with BuildLine():
            CenterArc((CONG_1_R, CONG_1_R), CONG_1_R, 180, 90)
            Line((0, CONG_1_R), (0, 0))
            Line((0, 0), (CONG_1_R, 0))
        make_face()
    extrude(amount=17)
    # the kernel refuses this fillet: 10 mm, written as the material it takes off along each edge
    with BuildSketch(Plane(origin=(60, -25, 60), x_dir=(0, 0, -1), z_dir=(0, 1, 0)), Plane(origin=(0, -25, 60), x_dir=(1, 0, 0), z_dir=(0, 1, 0))) as cong_1_2_piece_1:
        with BuildLine():
            CenterArc((CONG_1_R, CONG_1_R), CONG_1_R, 180, 90)
            Line((0, CONG_1_R), (0, 0))
            Line((0, 0), (CONG_1_R, 0))
        make_face()
    extrude(amount=84, mode=Mode.SUBTRACT)

    # Chanfrein1
    chanfrein1_edges = [part.edges().sort_by_distance(p)[0] for p in [
        (60, -1.5, 2.5),
        (60, -2.25, 5),
        (60, -3, 6.5),
        (60, -1.5, 8),
        (60, 0, 4),
    ]]
    chamfer(chanfrein1_edges, length=CHANFREIN1_SIZE)

    # Esquisse15 → Enlèv. mat.-Extru.11 (cut)
    with BuildSketch(Plane(origin=(60, 0, 0), x_dir=(0, 0, -1), z_dir=(1, 0, 0))):
        with Locations((-32.2, 1)):
            Rectangle(ESQUISSE15_W, ESQUISSE15_H)
        with Locations((-32.2, 5)):
            Rectangle(ESQUISSE15_W_2, ESQUISSE15_H)
    extrude(amount=-ENL_V_MAT_EXTRU_11_DEPTH, mode=Mode.SUBTRACT)


solid = part.part
